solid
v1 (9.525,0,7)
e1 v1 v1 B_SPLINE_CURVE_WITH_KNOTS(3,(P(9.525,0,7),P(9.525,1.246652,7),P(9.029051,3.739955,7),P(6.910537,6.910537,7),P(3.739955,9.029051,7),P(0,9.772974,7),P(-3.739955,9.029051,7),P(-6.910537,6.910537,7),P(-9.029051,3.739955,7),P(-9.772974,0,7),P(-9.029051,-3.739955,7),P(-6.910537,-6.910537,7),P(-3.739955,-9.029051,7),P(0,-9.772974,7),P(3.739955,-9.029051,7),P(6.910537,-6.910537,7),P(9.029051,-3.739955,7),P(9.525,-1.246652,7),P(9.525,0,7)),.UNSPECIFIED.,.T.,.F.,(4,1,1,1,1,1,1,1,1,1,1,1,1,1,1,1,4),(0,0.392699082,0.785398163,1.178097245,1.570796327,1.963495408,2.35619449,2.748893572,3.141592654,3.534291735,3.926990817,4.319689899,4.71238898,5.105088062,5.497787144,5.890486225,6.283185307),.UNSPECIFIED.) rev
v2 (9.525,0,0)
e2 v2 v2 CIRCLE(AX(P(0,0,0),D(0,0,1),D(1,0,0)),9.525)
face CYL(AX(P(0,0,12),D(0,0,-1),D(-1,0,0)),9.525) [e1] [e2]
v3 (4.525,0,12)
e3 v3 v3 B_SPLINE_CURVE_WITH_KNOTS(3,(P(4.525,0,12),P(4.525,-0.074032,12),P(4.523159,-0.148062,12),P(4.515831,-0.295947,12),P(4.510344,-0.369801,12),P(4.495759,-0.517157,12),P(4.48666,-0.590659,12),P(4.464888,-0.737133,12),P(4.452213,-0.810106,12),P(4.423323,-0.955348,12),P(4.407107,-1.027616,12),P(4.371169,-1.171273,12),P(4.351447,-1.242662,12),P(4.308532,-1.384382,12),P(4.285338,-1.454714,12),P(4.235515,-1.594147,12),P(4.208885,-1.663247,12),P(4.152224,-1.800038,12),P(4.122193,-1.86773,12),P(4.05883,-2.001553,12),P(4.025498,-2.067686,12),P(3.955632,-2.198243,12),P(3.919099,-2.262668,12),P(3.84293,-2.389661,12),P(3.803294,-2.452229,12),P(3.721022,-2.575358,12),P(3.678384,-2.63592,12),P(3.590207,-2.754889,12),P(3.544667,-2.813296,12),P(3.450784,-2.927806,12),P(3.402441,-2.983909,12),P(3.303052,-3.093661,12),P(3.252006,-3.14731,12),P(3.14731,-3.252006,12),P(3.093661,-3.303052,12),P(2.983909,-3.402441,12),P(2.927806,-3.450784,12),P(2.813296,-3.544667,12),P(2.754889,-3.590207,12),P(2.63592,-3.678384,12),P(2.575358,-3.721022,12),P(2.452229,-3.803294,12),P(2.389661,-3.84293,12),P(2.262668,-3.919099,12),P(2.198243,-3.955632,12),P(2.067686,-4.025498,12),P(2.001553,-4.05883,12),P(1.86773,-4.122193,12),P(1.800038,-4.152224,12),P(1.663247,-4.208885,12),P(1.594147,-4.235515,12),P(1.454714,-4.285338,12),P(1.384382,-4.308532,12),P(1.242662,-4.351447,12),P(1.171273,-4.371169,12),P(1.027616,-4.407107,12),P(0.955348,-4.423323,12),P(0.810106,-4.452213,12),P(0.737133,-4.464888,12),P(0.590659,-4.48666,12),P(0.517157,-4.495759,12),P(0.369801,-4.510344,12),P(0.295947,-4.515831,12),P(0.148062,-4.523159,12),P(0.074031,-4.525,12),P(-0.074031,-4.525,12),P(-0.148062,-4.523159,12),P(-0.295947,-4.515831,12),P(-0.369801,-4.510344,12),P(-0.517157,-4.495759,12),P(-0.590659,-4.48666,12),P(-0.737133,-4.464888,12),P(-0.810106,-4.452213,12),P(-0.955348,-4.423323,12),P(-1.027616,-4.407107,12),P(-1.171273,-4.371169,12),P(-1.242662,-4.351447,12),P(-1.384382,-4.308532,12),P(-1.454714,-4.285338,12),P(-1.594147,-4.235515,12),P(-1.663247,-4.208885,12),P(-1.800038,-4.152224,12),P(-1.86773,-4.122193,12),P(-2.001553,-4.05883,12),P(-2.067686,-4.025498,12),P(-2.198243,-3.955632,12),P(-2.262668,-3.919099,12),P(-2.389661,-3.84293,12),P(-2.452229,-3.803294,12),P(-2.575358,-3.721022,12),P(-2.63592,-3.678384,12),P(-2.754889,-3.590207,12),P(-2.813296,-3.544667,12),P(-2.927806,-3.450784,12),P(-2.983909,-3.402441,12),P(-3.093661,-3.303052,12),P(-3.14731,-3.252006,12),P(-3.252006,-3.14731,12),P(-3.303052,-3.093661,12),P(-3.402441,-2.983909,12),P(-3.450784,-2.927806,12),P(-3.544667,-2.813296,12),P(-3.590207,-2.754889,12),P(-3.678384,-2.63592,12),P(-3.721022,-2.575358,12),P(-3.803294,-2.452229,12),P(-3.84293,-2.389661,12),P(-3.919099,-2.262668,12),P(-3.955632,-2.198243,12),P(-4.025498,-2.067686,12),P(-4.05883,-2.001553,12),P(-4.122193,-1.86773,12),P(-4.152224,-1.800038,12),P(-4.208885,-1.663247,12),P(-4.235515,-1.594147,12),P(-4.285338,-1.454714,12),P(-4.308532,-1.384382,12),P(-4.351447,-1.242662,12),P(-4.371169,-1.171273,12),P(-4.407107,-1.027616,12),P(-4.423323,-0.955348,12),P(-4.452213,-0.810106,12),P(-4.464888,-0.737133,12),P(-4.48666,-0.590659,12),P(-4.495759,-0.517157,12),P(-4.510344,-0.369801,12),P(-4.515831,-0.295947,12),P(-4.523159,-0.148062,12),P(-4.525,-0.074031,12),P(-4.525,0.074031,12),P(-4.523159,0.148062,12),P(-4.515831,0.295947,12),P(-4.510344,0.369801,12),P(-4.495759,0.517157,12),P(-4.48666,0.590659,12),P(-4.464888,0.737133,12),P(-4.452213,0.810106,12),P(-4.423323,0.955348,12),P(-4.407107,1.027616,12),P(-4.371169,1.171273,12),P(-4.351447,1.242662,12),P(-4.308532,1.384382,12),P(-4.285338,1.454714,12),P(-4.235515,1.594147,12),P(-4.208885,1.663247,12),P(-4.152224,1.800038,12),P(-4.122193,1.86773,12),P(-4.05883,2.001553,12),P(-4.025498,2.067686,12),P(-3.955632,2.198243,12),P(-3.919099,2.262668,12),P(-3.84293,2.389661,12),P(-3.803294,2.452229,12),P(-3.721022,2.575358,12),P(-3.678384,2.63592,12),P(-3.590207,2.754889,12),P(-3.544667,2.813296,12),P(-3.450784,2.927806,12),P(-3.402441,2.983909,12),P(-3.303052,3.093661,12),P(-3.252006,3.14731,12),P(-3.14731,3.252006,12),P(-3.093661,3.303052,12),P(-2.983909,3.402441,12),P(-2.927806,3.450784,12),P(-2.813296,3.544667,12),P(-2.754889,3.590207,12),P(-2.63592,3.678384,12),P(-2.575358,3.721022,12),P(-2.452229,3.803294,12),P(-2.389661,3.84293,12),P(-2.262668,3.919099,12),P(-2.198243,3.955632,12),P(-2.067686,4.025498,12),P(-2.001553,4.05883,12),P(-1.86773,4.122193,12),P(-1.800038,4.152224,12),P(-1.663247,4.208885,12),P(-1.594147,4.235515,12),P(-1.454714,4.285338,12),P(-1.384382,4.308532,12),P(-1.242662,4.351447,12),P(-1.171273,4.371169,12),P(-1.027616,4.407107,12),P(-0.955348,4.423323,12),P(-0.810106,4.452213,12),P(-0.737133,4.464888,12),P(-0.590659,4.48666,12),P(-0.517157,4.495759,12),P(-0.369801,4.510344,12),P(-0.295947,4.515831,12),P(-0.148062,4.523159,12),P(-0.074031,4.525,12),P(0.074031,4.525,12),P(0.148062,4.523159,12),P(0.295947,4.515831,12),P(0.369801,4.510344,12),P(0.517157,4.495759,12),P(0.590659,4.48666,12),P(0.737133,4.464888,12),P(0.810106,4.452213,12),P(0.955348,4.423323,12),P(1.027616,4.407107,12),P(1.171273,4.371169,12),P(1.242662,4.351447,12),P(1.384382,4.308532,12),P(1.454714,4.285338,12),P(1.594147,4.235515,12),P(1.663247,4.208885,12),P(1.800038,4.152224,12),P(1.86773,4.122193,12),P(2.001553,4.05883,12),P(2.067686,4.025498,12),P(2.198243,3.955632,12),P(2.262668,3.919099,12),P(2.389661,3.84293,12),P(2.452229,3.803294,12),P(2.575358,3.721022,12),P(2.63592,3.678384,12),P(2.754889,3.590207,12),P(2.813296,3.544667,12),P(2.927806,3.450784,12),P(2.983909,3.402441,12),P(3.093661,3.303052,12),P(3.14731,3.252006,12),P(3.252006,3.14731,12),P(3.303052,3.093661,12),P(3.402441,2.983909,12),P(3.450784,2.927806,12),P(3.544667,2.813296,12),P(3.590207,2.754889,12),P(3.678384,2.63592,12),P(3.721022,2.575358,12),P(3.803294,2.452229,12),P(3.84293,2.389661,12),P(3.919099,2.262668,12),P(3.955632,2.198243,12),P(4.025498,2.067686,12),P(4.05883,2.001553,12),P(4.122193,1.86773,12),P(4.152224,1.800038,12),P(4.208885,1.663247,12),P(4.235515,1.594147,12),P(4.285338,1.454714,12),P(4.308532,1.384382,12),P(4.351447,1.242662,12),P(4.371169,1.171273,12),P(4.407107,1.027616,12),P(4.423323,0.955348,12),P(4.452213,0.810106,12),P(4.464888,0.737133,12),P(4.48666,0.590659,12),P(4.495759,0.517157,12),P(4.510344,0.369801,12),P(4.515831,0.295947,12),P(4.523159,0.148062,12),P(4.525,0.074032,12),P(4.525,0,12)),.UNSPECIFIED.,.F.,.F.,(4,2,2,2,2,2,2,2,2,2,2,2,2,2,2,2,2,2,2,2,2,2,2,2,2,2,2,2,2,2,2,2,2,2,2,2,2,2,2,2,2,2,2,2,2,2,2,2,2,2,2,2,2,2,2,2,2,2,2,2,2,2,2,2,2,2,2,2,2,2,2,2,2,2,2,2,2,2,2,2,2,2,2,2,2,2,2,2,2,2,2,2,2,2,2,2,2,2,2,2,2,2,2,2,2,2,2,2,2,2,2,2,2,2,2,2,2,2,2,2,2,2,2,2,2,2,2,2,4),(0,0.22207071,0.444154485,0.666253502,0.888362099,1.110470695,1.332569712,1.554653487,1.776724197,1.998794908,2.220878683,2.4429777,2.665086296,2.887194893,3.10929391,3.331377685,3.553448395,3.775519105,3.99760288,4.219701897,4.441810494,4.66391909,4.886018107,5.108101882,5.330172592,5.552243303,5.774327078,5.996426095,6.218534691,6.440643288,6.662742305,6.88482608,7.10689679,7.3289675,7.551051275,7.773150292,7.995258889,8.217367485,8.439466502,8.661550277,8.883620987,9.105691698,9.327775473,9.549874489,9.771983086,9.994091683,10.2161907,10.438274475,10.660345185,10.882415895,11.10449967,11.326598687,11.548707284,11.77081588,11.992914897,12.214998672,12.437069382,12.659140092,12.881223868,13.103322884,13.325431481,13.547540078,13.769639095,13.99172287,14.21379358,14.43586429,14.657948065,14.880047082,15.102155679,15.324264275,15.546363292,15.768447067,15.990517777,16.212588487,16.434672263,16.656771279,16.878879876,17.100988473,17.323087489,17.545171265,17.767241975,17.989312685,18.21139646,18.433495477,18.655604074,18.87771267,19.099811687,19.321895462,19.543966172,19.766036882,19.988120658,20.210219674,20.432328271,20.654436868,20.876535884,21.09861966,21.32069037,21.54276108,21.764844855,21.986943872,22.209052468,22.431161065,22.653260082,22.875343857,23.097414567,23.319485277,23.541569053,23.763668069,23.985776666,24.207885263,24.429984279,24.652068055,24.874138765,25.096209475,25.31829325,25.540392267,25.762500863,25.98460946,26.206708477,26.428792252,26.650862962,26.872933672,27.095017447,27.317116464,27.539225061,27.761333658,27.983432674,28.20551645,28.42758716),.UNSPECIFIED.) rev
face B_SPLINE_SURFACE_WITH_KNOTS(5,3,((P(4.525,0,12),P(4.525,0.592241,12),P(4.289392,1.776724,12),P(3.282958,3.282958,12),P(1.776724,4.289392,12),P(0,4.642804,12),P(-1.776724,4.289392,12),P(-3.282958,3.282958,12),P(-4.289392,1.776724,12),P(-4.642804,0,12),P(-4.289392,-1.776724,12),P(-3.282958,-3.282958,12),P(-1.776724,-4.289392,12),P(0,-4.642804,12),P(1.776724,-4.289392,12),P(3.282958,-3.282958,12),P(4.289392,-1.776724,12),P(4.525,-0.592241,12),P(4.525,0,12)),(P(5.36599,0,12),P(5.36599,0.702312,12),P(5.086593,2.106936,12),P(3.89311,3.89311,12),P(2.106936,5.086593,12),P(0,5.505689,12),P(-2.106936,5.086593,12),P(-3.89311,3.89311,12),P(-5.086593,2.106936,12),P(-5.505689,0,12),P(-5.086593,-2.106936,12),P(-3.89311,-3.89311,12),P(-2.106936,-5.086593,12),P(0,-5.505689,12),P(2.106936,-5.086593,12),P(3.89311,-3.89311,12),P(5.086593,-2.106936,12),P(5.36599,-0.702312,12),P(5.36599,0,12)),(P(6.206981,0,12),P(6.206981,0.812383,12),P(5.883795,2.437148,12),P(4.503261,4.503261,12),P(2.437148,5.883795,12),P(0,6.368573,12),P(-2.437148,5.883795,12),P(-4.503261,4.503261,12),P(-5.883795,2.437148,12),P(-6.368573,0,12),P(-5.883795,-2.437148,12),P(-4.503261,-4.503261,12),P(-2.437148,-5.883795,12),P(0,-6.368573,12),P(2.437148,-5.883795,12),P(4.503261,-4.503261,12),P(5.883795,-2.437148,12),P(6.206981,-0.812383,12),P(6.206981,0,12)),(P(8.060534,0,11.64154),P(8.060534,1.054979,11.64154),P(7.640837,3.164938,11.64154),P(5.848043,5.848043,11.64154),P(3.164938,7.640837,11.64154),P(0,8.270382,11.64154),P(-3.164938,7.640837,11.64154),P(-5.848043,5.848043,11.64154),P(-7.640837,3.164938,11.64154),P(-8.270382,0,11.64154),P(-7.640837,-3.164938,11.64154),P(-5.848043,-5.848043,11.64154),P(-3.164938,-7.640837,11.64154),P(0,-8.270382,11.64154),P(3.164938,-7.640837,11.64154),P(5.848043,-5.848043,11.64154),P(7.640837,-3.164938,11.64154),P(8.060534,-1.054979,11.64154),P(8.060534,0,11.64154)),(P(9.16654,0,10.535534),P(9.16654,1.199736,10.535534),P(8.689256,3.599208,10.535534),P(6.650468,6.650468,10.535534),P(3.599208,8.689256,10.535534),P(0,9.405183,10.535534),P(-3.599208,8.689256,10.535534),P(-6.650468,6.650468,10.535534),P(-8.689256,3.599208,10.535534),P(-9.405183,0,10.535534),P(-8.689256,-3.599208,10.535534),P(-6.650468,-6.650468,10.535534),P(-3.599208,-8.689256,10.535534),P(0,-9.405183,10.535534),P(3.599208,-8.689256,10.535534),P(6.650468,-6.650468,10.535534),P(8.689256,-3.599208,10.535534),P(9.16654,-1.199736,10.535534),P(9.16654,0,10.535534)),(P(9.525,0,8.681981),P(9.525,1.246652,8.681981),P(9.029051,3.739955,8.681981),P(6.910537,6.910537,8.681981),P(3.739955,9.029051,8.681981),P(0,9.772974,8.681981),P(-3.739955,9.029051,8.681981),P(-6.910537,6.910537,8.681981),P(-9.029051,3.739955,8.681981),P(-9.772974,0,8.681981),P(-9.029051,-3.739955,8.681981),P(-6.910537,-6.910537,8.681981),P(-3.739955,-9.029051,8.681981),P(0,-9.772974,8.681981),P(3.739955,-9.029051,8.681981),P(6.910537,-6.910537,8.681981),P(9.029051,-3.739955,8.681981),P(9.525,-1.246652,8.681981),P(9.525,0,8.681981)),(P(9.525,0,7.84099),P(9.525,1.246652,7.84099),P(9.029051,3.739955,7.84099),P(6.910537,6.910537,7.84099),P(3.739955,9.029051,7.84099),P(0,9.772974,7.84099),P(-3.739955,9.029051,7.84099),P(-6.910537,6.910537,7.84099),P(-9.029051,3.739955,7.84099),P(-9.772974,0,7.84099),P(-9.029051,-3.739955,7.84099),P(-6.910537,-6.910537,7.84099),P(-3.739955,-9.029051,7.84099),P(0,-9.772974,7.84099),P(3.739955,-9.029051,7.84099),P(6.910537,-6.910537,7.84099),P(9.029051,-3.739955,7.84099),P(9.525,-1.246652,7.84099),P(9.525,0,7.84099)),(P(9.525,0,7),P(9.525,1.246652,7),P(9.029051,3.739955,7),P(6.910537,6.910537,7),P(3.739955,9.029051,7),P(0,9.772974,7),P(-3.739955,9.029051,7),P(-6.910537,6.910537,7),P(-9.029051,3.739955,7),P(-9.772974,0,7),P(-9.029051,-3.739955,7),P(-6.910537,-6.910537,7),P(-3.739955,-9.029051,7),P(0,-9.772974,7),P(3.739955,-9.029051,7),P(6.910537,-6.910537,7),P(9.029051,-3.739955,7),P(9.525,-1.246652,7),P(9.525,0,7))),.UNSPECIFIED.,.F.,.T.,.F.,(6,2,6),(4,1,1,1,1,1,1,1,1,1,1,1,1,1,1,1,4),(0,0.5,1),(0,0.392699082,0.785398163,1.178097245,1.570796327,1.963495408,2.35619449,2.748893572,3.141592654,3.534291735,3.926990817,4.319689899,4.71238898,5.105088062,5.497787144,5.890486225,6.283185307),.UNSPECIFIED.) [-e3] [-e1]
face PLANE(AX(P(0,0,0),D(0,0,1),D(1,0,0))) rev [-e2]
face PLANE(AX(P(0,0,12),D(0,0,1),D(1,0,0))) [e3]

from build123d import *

# Parameters (mm, degrees)
SKETCH1_R           = 9.525
BOSS_EXTRUDE1_DEPTH = 12
FILLET1_SIZE        = 5


with BuildPart() as part:
    # Sketch1 → Boss-Extrude1 (new body)
    with BuildSketch(Plane.XY):
        Circle(SKETCH1_R)
    extrude(amount=BOSS_EXTRUDE1_DEPTH)

    # Fillet1
    # a fillet whose section is not a circle: 5 mm, written as the material it takes off along each edge
    with BuildSketch(Plane(origin=(0, 0, 12), x_dir=(1, 0, 0), z_dir=(0, -1, 0))) as fillet1_piece_1:
        with BuildLine():
            add(Edge.make_bspline([(9.525, -FILLET1_SIZE), (9.525, -FILLET1_SIZE * 0.831801948466), (9.525, -FILLET1_SIZE * 0.663603896932), (9.525 - FILLET1_SIZE * 0.0716919198361, -FILLET1_SIZE * 0.292893218813), (9.525 - FILLET1_SIZE * 0.292893218813, -FILLET1_SIZE * 0.0716919198361), (9.525 - FILLET1_SIZE * 0.663603896932, 0), (9.525 - FILLET1_SIZE * 0.831801948466, 0), (9.525 - FILLET1_SIZE, 0)], knots=[0, 0, 0, 0, 0, 0, 0.5, 0.5, 1, 1, 1, 1, 1, 1], degree=5))
            Line((9.525 - FILLET1_SIZE, 0), (9.525, 0))
            Line((9.525, 0), (9.525, -FILLET1_SIZE))
        make_face()
    revolve(axis=Axis((0, 0, 12), (0, 0, 1)), mode=Mode.SUBTRACT)


solid = part.part
